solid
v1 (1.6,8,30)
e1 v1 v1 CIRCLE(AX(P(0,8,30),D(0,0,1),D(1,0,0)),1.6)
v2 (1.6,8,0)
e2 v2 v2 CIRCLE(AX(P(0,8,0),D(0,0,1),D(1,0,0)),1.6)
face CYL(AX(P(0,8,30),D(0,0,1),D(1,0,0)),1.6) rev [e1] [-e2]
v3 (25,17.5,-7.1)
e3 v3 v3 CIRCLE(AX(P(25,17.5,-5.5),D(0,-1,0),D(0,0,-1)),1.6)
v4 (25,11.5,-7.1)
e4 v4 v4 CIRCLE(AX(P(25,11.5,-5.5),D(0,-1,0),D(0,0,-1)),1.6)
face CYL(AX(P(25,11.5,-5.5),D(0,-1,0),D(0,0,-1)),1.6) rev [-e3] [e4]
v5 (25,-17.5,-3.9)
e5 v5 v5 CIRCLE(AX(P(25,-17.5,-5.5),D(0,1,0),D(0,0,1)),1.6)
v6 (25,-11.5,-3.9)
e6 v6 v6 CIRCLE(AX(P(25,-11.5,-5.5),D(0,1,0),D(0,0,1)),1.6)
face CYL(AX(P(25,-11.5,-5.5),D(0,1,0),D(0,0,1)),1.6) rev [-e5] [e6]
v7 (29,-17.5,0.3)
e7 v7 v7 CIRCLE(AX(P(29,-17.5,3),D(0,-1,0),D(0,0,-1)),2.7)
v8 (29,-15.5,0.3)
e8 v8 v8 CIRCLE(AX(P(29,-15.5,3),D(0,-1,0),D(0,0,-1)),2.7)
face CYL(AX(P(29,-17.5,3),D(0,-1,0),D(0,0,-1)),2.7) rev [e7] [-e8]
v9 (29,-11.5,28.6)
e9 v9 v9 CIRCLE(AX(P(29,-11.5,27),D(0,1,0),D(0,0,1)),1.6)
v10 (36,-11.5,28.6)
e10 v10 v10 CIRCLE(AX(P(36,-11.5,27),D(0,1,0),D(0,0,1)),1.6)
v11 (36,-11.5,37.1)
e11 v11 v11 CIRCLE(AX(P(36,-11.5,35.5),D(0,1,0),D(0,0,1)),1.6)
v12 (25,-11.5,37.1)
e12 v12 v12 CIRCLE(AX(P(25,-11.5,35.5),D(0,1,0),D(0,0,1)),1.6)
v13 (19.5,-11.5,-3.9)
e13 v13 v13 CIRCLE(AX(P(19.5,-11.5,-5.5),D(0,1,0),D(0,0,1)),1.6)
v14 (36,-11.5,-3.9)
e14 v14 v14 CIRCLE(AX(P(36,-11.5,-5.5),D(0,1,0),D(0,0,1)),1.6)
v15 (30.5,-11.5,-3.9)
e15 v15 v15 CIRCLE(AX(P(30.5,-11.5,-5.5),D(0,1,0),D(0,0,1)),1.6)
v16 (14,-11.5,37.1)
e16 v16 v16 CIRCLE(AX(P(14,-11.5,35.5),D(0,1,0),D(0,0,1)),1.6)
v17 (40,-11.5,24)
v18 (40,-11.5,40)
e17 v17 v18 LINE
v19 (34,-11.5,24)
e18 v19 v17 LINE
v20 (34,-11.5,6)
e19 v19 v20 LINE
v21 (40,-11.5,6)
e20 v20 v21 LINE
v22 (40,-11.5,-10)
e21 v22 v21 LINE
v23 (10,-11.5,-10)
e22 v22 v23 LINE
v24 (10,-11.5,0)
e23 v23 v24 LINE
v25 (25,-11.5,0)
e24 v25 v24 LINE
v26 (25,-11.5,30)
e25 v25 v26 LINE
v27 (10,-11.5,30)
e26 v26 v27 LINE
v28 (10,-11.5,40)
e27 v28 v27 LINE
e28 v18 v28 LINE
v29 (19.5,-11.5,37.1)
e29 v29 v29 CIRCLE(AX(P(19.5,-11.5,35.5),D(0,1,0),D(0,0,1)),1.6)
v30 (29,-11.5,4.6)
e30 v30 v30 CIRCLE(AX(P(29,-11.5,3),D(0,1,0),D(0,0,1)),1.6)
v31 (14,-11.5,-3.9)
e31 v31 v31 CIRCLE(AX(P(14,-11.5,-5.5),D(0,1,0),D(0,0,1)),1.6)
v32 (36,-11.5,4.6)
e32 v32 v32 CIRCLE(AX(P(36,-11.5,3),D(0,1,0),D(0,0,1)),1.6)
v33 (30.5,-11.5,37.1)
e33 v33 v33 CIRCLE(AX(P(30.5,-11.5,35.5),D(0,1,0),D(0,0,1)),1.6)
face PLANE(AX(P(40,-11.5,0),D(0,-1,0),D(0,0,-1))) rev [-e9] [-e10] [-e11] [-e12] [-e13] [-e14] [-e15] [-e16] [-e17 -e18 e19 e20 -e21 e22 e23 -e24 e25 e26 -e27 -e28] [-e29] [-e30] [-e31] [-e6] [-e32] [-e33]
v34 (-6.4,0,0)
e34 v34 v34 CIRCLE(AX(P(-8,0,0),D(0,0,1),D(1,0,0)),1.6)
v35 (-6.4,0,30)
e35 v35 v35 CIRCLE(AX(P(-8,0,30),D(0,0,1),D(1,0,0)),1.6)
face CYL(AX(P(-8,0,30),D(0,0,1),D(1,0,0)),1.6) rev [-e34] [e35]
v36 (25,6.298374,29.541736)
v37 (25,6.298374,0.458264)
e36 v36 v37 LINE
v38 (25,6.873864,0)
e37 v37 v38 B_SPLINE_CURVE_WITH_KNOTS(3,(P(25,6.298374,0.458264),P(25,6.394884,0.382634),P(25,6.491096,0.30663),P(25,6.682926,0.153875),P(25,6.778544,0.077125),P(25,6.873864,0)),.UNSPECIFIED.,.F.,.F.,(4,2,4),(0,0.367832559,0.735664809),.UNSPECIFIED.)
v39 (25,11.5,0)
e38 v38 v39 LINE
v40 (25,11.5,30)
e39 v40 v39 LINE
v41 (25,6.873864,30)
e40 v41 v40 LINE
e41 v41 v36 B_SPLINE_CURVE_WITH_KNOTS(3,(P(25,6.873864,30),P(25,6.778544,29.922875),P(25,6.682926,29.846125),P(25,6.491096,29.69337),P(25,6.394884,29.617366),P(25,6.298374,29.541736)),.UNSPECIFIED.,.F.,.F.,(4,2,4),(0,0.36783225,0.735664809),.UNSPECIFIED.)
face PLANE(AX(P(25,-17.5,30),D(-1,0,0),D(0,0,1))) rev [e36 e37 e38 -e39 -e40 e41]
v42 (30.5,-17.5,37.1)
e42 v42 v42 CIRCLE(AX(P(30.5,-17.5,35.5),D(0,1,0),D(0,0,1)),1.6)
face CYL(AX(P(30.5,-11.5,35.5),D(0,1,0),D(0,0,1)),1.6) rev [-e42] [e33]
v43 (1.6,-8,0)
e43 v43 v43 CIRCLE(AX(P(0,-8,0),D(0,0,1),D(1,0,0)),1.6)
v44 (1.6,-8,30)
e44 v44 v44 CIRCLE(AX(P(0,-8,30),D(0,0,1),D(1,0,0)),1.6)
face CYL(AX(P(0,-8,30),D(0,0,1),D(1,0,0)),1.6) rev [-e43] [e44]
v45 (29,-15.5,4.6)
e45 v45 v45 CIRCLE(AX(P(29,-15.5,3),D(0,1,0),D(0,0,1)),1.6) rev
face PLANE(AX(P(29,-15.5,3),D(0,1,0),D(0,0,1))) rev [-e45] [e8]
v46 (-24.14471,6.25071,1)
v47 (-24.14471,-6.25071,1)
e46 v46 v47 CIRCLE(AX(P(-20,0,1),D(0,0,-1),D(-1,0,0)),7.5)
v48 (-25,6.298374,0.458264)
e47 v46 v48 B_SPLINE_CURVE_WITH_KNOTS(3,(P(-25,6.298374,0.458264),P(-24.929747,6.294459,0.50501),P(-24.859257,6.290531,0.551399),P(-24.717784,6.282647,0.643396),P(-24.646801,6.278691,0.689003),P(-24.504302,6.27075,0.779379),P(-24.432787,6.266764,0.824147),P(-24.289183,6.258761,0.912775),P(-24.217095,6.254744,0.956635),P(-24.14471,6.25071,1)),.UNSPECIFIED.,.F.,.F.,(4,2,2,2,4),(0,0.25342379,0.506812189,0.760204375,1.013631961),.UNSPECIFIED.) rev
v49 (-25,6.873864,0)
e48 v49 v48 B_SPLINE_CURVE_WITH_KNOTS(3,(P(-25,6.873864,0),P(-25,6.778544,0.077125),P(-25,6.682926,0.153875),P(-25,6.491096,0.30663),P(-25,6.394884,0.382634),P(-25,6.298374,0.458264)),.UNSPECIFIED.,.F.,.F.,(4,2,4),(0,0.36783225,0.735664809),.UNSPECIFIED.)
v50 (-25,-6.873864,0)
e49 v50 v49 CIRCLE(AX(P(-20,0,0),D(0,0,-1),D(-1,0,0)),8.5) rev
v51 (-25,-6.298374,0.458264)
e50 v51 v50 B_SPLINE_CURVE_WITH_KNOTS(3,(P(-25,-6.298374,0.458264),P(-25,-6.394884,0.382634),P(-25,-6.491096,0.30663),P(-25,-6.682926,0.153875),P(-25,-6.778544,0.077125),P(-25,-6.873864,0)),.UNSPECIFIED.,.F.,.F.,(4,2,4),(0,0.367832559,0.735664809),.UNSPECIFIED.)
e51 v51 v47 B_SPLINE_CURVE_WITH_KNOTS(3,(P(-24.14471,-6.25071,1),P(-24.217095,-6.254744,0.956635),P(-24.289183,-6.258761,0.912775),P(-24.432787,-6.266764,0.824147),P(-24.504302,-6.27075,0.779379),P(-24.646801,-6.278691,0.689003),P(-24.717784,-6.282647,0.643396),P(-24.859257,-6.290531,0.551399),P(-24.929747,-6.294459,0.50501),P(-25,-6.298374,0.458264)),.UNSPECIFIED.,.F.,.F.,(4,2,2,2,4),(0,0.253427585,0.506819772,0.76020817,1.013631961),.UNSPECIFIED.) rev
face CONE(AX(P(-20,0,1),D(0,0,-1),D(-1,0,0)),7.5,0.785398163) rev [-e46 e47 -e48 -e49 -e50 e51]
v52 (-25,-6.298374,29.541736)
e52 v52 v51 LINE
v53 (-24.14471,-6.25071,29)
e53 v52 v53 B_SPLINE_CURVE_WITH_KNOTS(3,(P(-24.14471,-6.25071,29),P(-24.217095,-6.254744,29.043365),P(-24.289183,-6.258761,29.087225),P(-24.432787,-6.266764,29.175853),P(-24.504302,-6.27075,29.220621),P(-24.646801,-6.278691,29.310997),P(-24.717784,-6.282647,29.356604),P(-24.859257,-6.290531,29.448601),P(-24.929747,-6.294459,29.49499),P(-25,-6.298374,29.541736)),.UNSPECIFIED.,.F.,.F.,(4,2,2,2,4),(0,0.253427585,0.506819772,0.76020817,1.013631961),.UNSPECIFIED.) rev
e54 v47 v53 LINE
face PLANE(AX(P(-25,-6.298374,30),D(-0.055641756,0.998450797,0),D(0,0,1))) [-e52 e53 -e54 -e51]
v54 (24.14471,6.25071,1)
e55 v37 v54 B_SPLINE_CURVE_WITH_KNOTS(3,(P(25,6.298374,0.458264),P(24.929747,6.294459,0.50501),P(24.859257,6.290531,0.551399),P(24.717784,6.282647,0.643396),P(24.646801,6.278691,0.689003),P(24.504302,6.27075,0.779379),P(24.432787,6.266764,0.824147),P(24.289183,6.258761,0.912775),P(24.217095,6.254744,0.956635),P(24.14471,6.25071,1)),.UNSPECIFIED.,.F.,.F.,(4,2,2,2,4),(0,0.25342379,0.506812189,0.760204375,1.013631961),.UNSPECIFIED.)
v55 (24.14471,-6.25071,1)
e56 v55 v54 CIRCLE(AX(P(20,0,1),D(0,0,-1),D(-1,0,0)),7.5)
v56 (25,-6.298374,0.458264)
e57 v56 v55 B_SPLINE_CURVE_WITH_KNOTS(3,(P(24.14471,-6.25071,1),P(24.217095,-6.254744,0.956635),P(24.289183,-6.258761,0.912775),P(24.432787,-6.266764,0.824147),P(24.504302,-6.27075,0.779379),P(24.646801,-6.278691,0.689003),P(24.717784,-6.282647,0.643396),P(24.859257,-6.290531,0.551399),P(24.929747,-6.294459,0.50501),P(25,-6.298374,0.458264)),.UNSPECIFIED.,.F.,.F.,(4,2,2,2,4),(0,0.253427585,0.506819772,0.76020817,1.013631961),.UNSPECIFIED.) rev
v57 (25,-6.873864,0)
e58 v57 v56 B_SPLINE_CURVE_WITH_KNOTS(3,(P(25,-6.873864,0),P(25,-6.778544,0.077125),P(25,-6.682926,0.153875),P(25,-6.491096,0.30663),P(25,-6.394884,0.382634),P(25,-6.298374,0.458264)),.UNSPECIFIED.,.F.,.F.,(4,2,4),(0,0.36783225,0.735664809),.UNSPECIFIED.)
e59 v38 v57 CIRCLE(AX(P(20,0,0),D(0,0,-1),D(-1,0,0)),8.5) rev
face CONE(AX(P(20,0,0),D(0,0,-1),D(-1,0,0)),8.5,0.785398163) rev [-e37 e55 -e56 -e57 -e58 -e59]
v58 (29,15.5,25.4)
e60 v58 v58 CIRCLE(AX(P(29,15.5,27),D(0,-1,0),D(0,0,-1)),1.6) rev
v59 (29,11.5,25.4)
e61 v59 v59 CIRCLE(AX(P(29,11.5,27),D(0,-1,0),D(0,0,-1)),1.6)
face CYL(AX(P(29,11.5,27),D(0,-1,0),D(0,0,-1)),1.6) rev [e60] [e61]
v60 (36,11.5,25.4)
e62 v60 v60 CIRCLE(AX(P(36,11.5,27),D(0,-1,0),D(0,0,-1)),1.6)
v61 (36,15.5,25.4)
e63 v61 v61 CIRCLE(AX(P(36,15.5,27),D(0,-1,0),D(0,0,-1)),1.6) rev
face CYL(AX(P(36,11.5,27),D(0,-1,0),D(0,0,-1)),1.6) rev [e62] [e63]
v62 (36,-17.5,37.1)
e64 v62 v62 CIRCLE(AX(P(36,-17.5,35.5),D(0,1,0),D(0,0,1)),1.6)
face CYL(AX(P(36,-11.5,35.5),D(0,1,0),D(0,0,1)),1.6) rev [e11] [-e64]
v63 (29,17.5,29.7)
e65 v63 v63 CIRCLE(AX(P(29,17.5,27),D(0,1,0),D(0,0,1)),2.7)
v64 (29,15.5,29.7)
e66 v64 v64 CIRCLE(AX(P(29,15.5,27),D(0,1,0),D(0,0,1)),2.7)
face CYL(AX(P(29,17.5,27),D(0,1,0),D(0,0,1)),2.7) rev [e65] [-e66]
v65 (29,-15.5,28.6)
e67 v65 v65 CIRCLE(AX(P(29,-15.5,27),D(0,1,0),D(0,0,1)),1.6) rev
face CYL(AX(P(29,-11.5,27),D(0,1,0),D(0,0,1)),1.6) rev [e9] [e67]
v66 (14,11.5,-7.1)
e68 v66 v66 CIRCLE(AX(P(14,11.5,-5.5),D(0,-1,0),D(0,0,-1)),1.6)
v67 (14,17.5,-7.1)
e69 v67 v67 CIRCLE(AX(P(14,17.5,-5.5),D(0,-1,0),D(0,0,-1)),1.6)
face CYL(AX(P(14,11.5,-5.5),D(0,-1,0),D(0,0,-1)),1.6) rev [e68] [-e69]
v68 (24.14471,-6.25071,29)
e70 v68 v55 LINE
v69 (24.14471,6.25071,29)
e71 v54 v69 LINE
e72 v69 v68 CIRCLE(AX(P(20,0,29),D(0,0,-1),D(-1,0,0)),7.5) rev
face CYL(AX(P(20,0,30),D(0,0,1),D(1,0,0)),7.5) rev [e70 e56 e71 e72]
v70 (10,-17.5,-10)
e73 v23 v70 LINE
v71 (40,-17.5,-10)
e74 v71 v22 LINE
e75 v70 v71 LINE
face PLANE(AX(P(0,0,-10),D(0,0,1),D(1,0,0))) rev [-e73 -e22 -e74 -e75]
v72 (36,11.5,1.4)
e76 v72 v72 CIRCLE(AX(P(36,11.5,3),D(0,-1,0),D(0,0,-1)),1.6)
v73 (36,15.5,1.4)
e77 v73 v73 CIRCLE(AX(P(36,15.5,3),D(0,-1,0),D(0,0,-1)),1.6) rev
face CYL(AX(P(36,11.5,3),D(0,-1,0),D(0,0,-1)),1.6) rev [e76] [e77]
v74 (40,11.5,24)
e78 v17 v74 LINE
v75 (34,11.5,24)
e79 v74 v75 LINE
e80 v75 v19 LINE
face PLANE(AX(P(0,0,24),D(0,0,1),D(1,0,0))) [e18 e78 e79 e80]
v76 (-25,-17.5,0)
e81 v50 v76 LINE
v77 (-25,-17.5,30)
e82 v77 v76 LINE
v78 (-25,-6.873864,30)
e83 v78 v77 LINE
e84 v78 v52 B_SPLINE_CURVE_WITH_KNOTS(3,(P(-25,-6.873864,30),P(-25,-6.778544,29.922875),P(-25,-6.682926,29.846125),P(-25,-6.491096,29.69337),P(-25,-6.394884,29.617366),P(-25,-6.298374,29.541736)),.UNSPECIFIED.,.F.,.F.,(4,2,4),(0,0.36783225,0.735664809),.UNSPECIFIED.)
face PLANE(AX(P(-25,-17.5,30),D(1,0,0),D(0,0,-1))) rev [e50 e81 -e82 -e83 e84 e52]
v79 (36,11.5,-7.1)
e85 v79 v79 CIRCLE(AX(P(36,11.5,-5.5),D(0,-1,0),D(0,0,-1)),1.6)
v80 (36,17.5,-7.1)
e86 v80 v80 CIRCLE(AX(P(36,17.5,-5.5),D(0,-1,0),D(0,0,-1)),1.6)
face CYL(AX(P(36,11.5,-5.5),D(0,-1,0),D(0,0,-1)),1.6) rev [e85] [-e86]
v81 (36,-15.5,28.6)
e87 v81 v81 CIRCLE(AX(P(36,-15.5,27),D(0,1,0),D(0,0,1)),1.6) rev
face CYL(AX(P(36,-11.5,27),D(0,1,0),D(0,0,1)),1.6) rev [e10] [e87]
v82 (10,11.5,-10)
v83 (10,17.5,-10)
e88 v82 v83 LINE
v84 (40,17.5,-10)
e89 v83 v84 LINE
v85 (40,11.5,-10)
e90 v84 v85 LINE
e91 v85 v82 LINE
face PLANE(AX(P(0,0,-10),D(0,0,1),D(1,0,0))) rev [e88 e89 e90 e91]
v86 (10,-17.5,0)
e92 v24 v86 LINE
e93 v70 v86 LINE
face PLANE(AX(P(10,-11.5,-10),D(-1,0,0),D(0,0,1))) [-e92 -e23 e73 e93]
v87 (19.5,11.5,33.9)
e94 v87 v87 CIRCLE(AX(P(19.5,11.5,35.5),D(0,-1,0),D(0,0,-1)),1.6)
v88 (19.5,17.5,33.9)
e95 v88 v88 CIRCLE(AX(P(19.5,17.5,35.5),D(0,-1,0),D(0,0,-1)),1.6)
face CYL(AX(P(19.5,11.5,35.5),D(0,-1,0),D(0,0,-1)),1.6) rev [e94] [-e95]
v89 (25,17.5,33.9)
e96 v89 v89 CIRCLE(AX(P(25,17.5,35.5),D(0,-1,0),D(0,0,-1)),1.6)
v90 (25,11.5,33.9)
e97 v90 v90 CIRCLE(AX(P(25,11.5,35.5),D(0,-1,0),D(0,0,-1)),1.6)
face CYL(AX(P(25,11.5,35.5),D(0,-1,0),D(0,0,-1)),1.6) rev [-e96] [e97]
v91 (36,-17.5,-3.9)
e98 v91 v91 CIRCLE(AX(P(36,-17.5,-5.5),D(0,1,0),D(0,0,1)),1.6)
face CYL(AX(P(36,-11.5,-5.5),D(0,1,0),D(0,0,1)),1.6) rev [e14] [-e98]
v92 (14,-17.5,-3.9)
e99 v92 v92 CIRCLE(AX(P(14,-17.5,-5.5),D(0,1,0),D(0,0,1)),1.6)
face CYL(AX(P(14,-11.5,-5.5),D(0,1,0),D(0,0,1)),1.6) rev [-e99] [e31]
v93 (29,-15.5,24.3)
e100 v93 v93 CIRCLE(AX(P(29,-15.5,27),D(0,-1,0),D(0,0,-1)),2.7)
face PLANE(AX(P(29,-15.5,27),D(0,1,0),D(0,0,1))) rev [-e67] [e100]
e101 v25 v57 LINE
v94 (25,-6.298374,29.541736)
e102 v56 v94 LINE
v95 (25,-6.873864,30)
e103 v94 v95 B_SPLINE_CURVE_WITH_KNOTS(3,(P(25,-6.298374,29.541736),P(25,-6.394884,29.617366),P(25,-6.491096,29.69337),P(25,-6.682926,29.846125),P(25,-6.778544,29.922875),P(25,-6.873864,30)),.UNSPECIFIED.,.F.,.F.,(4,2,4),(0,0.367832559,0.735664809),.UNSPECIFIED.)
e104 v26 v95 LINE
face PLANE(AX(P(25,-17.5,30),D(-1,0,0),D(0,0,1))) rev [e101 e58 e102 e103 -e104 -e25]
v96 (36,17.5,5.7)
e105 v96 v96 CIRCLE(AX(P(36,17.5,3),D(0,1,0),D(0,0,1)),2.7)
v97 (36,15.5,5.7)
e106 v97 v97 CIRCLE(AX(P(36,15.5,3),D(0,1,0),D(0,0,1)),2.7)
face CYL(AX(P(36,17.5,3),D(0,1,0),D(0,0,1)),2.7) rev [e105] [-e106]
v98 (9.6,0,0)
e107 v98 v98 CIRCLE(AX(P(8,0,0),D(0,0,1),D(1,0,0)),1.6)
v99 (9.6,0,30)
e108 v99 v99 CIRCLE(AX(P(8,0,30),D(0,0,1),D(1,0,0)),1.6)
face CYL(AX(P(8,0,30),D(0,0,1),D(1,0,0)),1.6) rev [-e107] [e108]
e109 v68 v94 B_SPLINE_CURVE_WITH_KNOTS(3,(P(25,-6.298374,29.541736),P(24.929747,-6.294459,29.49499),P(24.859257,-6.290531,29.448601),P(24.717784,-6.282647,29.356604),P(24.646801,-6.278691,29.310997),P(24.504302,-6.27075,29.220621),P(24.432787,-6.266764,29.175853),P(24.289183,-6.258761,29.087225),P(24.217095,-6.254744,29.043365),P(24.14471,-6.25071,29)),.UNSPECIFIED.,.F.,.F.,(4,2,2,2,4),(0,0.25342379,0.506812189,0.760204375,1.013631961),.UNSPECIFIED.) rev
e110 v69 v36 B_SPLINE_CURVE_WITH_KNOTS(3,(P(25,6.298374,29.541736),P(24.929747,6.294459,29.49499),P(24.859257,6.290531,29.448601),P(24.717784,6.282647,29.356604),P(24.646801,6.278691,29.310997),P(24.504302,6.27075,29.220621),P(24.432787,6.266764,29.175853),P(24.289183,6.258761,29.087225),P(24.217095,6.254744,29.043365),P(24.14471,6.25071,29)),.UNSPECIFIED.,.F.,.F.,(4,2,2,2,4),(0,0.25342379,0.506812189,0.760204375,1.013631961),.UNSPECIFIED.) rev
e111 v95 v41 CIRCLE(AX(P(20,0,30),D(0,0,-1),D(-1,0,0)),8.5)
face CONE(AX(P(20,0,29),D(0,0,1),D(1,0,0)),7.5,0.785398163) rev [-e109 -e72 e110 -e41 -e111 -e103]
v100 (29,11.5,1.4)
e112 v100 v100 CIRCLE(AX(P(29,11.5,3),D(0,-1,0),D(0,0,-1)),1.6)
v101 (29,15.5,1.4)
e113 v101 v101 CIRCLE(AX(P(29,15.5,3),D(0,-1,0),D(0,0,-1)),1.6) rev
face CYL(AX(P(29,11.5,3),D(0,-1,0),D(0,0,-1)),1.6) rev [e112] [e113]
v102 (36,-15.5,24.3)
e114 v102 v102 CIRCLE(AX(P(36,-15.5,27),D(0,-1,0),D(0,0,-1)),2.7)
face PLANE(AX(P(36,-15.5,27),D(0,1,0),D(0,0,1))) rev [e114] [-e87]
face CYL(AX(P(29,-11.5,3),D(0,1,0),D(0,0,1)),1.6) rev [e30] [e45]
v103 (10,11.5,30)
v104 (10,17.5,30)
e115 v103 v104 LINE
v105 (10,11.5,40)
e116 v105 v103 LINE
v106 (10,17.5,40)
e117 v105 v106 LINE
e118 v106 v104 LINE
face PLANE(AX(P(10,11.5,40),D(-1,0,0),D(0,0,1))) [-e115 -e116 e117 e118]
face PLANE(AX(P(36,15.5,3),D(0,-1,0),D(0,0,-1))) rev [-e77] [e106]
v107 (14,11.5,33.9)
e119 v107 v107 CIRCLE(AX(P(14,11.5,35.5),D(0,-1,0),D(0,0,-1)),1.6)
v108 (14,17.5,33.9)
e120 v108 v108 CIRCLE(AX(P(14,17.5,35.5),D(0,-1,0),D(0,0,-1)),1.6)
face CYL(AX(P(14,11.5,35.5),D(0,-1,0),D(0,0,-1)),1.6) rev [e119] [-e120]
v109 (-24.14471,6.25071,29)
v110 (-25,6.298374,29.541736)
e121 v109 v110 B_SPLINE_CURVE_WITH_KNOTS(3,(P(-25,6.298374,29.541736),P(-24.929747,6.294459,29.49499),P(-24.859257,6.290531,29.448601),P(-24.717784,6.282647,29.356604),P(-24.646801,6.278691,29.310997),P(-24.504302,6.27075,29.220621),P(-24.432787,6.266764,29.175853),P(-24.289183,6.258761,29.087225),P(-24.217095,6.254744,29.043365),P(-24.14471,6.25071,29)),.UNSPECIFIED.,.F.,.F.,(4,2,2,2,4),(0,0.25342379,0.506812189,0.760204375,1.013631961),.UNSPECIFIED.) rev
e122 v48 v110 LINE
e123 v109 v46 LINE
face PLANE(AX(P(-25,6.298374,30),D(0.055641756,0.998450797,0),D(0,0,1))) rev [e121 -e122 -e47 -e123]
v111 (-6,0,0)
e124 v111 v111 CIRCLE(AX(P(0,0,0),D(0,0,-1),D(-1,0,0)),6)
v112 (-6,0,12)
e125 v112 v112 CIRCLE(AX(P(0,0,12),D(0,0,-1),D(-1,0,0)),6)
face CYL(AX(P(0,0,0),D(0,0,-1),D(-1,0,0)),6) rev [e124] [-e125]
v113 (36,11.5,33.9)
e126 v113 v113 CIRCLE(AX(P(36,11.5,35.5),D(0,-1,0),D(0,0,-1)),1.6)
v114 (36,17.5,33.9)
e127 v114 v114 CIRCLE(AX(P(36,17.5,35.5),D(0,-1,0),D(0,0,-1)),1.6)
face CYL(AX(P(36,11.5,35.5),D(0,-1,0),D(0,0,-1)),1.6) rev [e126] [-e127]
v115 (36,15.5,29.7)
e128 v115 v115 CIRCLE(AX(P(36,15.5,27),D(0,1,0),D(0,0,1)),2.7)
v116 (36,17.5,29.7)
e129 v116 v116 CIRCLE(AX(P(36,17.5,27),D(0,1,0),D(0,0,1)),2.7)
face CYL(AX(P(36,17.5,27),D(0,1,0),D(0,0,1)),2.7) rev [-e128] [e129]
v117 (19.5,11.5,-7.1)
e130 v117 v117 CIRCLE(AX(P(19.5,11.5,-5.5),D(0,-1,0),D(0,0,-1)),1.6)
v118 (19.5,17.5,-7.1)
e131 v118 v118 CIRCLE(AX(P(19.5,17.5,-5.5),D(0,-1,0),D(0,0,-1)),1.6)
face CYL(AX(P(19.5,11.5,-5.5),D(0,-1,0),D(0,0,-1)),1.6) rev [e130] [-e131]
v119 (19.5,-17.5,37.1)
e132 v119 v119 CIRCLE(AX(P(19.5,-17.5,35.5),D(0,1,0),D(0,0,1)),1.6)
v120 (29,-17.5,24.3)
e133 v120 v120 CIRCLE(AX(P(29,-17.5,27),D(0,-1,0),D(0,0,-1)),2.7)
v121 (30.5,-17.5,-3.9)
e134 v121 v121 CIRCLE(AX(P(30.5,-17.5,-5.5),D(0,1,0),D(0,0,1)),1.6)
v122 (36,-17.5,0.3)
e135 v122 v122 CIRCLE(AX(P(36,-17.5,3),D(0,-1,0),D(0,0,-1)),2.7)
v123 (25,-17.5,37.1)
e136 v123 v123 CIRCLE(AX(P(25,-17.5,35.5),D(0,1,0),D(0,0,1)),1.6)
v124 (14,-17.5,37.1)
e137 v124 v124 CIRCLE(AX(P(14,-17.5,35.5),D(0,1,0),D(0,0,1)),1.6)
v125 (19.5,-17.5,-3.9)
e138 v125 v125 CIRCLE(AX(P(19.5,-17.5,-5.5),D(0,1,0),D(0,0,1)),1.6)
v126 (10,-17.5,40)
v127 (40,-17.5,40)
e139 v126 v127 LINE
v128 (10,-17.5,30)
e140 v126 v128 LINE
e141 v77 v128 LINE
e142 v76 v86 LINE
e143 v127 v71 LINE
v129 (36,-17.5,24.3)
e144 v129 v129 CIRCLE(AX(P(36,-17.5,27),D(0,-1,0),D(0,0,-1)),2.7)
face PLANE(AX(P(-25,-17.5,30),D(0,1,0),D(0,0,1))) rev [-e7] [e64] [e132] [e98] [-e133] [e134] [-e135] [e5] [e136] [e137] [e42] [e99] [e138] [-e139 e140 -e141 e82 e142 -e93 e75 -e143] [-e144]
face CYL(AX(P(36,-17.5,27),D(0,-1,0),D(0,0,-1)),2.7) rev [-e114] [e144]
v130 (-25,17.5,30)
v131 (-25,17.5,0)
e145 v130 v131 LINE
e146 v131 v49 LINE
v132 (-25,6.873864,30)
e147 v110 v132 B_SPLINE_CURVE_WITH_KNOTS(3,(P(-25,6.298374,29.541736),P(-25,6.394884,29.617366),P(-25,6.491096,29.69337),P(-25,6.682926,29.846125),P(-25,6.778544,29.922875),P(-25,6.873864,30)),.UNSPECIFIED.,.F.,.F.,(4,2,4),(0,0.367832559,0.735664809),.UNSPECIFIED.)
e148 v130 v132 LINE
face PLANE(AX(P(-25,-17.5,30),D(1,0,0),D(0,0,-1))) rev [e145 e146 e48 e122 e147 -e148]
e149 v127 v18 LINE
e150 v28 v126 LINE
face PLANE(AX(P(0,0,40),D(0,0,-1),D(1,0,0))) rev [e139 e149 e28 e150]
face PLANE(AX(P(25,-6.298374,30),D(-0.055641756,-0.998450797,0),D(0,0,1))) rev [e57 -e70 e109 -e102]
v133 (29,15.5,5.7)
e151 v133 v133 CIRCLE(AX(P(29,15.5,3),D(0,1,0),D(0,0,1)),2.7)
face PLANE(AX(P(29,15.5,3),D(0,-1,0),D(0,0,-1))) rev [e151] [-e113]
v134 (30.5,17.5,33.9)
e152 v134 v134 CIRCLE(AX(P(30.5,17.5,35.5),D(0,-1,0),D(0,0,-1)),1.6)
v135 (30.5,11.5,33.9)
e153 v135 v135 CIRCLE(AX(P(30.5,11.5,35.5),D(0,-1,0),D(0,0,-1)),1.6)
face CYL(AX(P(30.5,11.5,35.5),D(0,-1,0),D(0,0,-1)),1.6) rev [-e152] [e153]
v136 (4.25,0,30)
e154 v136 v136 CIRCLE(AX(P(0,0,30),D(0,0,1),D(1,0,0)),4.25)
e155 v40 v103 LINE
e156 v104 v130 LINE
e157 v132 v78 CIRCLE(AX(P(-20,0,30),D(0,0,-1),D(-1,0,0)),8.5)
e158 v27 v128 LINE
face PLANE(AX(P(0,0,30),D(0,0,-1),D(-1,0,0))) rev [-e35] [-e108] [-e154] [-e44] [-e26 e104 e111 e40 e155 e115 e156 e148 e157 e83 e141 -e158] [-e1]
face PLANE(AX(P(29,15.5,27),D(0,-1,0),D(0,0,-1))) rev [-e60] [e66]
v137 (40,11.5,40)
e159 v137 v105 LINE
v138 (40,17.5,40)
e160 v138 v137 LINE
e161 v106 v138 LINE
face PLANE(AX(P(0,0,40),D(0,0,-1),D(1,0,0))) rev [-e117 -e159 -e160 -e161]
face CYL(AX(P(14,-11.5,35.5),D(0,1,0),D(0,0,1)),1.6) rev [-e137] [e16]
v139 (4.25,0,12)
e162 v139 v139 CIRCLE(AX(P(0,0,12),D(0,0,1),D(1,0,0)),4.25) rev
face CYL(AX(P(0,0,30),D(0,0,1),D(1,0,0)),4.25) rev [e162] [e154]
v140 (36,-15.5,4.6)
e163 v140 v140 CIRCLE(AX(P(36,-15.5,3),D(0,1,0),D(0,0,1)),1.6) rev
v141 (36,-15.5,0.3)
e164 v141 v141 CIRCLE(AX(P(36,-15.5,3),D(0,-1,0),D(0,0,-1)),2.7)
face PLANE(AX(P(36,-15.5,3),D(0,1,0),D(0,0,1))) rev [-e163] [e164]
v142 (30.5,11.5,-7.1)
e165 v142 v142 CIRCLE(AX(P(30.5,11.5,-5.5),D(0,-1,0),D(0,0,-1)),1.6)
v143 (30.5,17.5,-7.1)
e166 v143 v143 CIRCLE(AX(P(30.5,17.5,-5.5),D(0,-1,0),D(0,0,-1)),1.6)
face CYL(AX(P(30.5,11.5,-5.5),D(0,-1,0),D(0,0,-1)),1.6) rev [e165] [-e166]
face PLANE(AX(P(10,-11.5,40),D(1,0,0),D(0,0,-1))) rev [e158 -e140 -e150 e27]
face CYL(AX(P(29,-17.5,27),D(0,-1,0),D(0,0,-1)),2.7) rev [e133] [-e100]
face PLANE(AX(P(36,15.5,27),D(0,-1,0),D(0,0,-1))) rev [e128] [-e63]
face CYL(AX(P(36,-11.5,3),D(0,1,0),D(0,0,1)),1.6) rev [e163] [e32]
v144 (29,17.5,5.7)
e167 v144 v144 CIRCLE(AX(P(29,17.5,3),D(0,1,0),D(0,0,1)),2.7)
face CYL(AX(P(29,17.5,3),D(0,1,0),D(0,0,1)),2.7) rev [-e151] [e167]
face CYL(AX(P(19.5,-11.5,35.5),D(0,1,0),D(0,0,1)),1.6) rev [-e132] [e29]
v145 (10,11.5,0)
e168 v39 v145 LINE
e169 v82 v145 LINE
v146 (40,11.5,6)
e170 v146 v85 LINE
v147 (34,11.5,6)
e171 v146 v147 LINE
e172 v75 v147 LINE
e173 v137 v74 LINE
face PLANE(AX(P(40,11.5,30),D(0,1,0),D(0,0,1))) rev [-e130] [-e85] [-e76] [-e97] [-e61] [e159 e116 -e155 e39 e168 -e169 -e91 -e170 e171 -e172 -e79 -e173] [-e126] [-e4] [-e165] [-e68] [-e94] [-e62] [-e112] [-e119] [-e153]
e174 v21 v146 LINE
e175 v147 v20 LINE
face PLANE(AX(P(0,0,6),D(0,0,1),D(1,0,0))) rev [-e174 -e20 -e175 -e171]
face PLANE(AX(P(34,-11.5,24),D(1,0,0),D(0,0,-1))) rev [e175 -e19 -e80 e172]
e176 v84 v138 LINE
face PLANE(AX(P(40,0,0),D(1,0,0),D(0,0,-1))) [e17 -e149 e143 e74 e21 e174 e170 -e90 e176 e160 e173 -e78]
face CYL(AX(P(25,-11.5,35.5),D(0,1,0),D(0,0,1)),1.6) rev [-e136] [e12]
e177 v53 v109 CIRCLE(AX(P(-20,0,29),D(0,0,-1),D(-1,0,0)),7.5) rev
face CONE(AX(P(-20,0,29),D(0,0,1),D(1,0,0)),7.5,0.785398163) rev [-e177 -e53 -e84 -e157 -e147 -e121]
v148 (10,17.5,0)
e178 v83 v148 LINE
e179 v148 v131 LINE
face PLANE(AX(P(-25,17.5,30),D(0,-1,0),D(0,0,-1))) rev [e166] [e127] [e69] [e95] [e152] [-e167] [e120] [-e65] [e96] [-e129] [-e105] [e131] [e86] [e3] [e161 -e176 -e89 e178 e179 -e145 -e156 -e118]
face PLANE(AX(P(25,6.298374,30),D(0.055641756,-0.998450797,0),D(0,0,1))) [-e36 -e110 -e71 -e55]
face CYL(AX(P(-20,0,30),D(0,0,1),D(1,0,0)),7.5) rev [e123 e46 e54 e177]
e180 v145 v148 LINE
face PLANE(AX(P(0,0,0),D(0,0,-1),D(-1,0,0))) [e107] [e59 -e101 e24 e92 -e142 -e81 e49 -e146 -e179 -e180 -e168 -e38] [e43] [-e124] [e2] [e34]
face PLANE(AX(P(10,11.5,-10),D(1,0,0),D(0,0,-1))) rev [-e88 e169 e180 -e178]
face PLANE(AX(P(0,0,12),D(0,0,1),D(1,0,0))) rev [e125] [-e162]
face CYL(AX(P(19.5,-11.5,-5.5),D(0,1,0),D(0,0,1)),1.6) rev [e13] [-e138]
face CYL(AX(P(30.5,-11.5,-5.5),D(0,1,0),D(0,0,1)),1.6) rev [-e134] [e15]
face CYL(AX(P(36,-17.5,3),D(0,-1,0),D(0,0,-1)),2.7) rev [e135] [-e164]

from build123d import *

# Parameters (mm, degrees)
SKETCH_1_W               = 50
SKETCH_1_H               = 35
EXTRUDE_1_DEPTH          = 30
HOLE_WIZARD_394_D        = 8.5
HOLE_WIZARD_498_D        = 3.2
HOLE_WIZARD_652_D        = 15
CHAMFER_1_SIZE           = 1
CHAMFER_1_SIZE_2         = 0.708203932
SKETCH_9_W               = 30
SKETCH_9_H               = 6
EXTRUDE_3_DEPTH          = 15
SKETCH_10_W              = 6
SKETCH_10_H              = 23
EXTRUDE_4_DEPTH          = 9
HOLE_WIZARD_1_D          = 3.2
HOLE_WIZARD_1_DEPTH      = 6
MIRROR_2_COPY_1_D        = 3.2
MIRROR_2_COPY_1_DEPTH    = 6
SKETCH_15_W              = 30
SKETCH_15_H              = 6
EXTRUDE_6_DEPTH          = 10
HOLE_WIZARD_2_D          = 3.2
MIRROR_5_COPY_1_D        = 3.2
MIRROR_6_COPY_1_D        = 3.2
MIRROR_6_COPY_2_SKETCH_W = 30
MIRROR_6_COPY_2_SKETCH_H = 6
MIRROR_6_COPY_2_DEPTH    = 10
MIRROR_6_COPY_3_D        = 3.2
MIRROR_6_COPY_4_D        = 3.2
HOLE_WIZARD_3_D          = 5.4
HOLE_WIZARD_3_DEPTH      = 2
HOLE_WIZARD_4_D          = 12
HOLE_WIZARD_4_DEPTH      = 12


with BuildPart() as part:
    # 草图1 → 凸台-拉伸1 (new body)
    with BuildSketch(Plane.XY):
        Rectangle(SKETCH_1_W, SKETCH_1_H)
    extrude(amount=EXTRUDE_1_DEPTH)

    # Hole Wizard 394 (through all)
    with Locations(Plane.XY.offset(30)):
        with Locations((0, 0)):
            Hole(HOLE_WIZARD_394_D / 2)

    # Hole Wizard 498 (through all)
    with Locations(Plane.XY.offset(30)):
        with Locations((8, 0), (0, 8), (-8, 0), (0, -8)):
            Hole(HOLE_WIZARD_498_D / 2)

    # Hole Wizard 652 (through all)
    with Locations(Plane.XY.offset(30)):
        with Locations((20, 0), (-20, 0)):
            Hole(HOLE_WIZARD_652_D / 2)

    # 倒角1
    # the kernel refuses this chamfer: 1, 0.708203932 mm, written as the material it takes off along each edge
    with BuildSketch(Plane(origin=(-20, 0, 0), x_dir=(-0.8790200859122482, 0.4767847402789059, 0), z_dir=(-0.4767847402789059, -0.8790200859122482, 0))) as chamfer_1_piece_1:
        Polygon((7.5, -CHAMFER_1_SIZE), (7.5 + CHAMFER_1_SIZE, 0), (7.5, 0), align=None)
    revolve(axis=Axis((-20, 0, 0), (0, 0, -1)), revolution_arc=303.048763938, mode=Mode.SUBTRACT)
    with BuildSketch(Plane(origin=(-20, 0, 30), x_dir=(-0.879020085912248, 0.47678474027890627, 0), z_dir=(-0.47678474027890627, -0.879020085912248, 0))) as chamfer_1_piece_2:
        Polygon((7.5 + CHAMFER_1_SIZE, 0), (7.5, CHAMFER_1_SIZE), (7.5, 0), align=None)
    revolve(axis=Axis((-20, 0, 30), (0, 0, -1)), revolution_arc=303.048763938, mode=Mode.SUBTRACT)
    with BuildSketch(Plane(origin=(20, 0, 30), x_dir=(0.879020085912248, -0.4767847402789061, 0), z_dir=(0.4767847402789061, 0.879020085912248, 0))) as chamfer_1_piece_3:
        Polygon((7.5 + CHAMFER_1_SIZE, 0), (7.5, CHAMFER_1_SIZE), (7.5, 0), align=None)
    revolve(axis=Axis((20, 0, 30), (0, 0, -1)), revolution_arc=303.048763938, mode=Mode.SUBTRACT)
    with BuildSketch(Plane(origin=(20, 0, 0), x_dir=(0.8790200859122481, 0.476784740278906, 0), z_dir=(0.476784740278906, -0.8790200859122481, 0))) as chamfer_1_piece_4:
        Polygon((7.5, CHAMFER_1_SIZE), (7.5 + CHAMFER_1_SIZE, 0), (7.5, 0), align=None)
    revolve(axis=Axis((20, 0, 0), (0, 0, 1)), revolution_arc=303.048763938, mode=Mode.SUBTRACT)
    with BuildSketch(Plane(origin=(-25, 5.590169944, 32.778051389), x_dir=(0.7914486393779661, 0.611235675682274, 0), z_dir=(0, 0, -1)), Plane(origin=(25, -5.590169944, 32.778051389), x_dir=(-0.7914486393779661, -0.611235675682274, 0), z_dir=(0, 0, -1))) as chamfer_1_piece_5:
        with BuildLine():
            Line((1.080663788, 0), (CHAMFER_1_SIZE_2 * 0.611235676113, -CHAMFER_1_SIZE_2 * 0.791448639936))
            Line((CHAMFER_1_SIZE_2 * 0.611235676113, -CHAMFER_1_SIZE_2 * 0.791448639936), (0, 0))
            ThreePointArc((0, 0), (0.555522087, -0.019473843), (1.080663788, 0))
        make_face()
    extrude(amount=35.556102778, mode=Mode.SUBTRACT)
    with BuildSketch(Plane(origin=(-25, -5.590169944, 32.778051389), x_dir=(0.7914486393779665, -0.6112356756822735, 0), z_dir=(0, 0, -1))) as chamfer_1_piece_6:
        with BuildLine():
            Line((1.080663788, 0), (CHAMFER_1_SIZE_2 * 0.611235676113, CHAMFER_1_SIZE_2 * 0.791448639936))
            Line((CHAMFER_1_SIZE_2 * 0.611235676113, CHAMFER_1_SIZE_2 * 0.791448639936), (0, 0))
            ThreePointArc((0, 0), (0.555522087, 0.019473843), (1.080663788, 0))
        make_face()
    extrude(amount=35.556102778, mode=Mode.SUBTRACT)
    with BuildSketch(Plane(origin=(25, 5.590169944, 32.778051389), x_dir=(0, 1, 0), z_dir=(0, 0, -1))) as chamfer_1_piece_7:
        with BuildLine():
            Line((CHAMFER_1_SIZE_2, 0), (0.660540261, -0.855289885))
            ThreePointArc((0.660540261, -0.855289885), (0.354967464, -0.427764092), (0, 0))
            Line((0, 0), (CHAMFER_1_SIZE_2, 0))
        make_face()
    extrude(amount=35.556102778, mode=Mode.SUBTRACT)

    # 草图9 → 凸台-拉伸3 (add)
    with BuildSketch(Plane(origin=(25, 0, 0), x_dir=(0, 0, -1), z_dir=(1, 0, 0))):
        with Locations((-15, 14.5)):
            Rectangle(SKETCH_9_W, SKETCH_9_H)
        with Locations((-15, -14.5)):
            Rectangle(SKETCH_9_W, SKETCH_9_H)
    extrude(amount=EXTRUDE_3_DEPTH)

    # 草图10 → 凸台-拉伸4 (add, symmetric)
    with BuildSketch(Plane.XY.offset(15)):
        with Locations((37, 0)):
            Rectangle(SKETCH_10_W, SKETCH_10_H)
    extrude(amount=EXTRUDE_4_DEPTH, both=True)

    # 孔1
    with Locations(Plane(origin=(0, 11.5, 0), x_dir=(-1, 0, 0), z_dir=(0, -1, 0))):
        with Locations((-36, -3), (-29, -3)):
            hole_wizard_1 = Hole(HOLE_WIZARD_1_D / 2, depth=HOLE_WIZARD_1_DEPTH)

    # 镜向1: 孔1 across plane
    add(hole_wizard_1.mirror(Plane.XY.offset(15)), mode=Mode.SUBTRACT)

    # 镜向2: 孔1 across plane
    add(hole_wizard_1.mirror(Plane(origin=(0, 0, 0), x_dir=(0, 0, 1), z_dir=(0, -1, 0))), mode=Mode.SUBTRACT)

    # 镜向2 copy 1
    with Locations(Plane(origin=(0, -11.5, 30), x_dir=(-1, 0, 0), z_dir=(0, 1, 0))):
        with Locations((-36, -3), (-29, -3)):
            Hole(MIRROR_2_COPY_1_D / 2, depth=MIRROR_2_COPY_1_DEPTH)

    # 草图15 → 凸台-拉伸6 (add)
    with BuildSketch(Plane(origin=(0, 0, 0), x_dir=(-1, 0, 0), z_dir=(0, 0, -1))):
        with Locations((-25, 14.5)):
            Rectangle(SKETCH_15_W, SKETCH_15_H)
    extrude_6 = extrude(amount=EXTRUDE_6_DEPTH)

    # 孔2 (through all)
    with Locations(Plane(origin=(0, 11.5, 0), x_dir=(-1, 0, 0), z_dir=(0, -1, 0))):
        with Locations((-19.5, 5.5), (-14, 5.5), (-25, 5.5)):
            hole_wizard_2 = Hole(HOLE_WIZARD_2_D / 2)

    # 镜向4: 孔2 across plane
    add(hole_wizard_2.mirror(Plane(origin=(25, 0, 0), x_dir=(0, 0, 1), z_dir=(1, 0, 0))), mode=Mode.SUBTRACT)

    # 镜向5: 凸台-拉伸6, 孔2 across plane
    add(extrude_6.mirror(Plane.XY.offset(15)))
    add(hole_wizard_2.mirror(Plane.XY.offset(15)), mode=Mode.SUBTRACT)

    # 镜向5 copy 1 (through all)
    with Locations(Plane(origin=(50, 11.5, 30), x_dir=(1, 0, 0), z_dir=(0, -1, 0))):
        with Locations((-19.5, 5.5), (-14, 5.5), (-25, 5.5)):
            Hole(MIRROR_5_COPY_1_D / 2)

    # 镜向6: 凸台-拉伸6, 孔2 across plane
    add(extrude_6.mirror(Plane(origin=(0, 0, 0), x_dir=(0, 0, 1), z_dir=(0, -1, 0))))
    add(hole_wizard_2.mirror(Plane(origin=(0, 0, 0), x_dir=(0, 0, 1), z_dir=(0, -1, 0))), mode=Mode.SUBTRACT)

    # 镜向6 copy 1 (through all)
    with Locations(Plane(origin=(50, -11.5, 0), x_dir=(1, 0, 0), z_dir=(0, 1, 0))):
        with Locations((-19.5, 5.5), (-14, 5.5), (-25, 5.5)):
            Hole(MIRROR_6_COPY_1_D / 2)

    # 镜向6 copy 2 sketch → 镜向6 copy 2 (add)
    with BuildSketch(Plane(origin=(0, 0, 30), x_dir=(-1, 0, 0), z_dir=(0, 0, 1))):
        with Locations((-25, 14.5)):
            Rectangle(MIRROR_6_COPY_2_SKETCH_W, MIRROR_6_COPY_2_SKETCH_H)
    extrude(amount=MIRROR_6_COPY_2_DEPTH)

    # 镜向6 copy 3 (through all)
    with Locations(Plane(origin=(0, -11.5, 30), x_dir=(-1, 0, 0), z_dir=(0, 1, 0))):
        with Locations((-19.5, 5.5), (-14, 5.5), (-25, 5.5)):
            Hole(MIRROR_6_COPY_3_D / 2)

    # 镜向6 copy 4 (through all)
    with Locations(Plane(origin=(50, -11.5, 30), x_dir=(1, 0, 0), z_dir=(0, 1, 0))):
        with Locations((-19.5, -5.5), (-14, -5.5), (-25, -5.5)):
            Hole(MIRROR_6_COPY_4_D / 2)

    # 孔3
    with Locations(Plane(origin=(0, -17.5, 0), x_dir=(-1, 0, 0), z_dir=(0, -1, 0))):
        with Locations((-29, -3), (-36, -3), (-36, -27), (-29, -27)):
            hole_wizard_3 = Hole(HOLE_WIZARD_3_D / 2, depth=HOLE_WIZARD_3_DEPTH)

    # 镜向7: 孔3 across plane
    add(hole_wizard_3.mirror(Plane(origin=(0, 0, 0), x_dir=(0, 0, 1), z_dir=(0, -1, 0))), mode=Mode.SUBTRACT)

    # 孔4
    with Locations(Plane(origin=(0, 0, 0), x_dir=(-1, 0, 0), z_dir=(0, 0, -1))):
        with Locations((0, 0)):
            Hole(HOLE_WIZARD_4_D / 2, depth=HOLE_WIZARD_4_DEPTH)


solid = part.part
